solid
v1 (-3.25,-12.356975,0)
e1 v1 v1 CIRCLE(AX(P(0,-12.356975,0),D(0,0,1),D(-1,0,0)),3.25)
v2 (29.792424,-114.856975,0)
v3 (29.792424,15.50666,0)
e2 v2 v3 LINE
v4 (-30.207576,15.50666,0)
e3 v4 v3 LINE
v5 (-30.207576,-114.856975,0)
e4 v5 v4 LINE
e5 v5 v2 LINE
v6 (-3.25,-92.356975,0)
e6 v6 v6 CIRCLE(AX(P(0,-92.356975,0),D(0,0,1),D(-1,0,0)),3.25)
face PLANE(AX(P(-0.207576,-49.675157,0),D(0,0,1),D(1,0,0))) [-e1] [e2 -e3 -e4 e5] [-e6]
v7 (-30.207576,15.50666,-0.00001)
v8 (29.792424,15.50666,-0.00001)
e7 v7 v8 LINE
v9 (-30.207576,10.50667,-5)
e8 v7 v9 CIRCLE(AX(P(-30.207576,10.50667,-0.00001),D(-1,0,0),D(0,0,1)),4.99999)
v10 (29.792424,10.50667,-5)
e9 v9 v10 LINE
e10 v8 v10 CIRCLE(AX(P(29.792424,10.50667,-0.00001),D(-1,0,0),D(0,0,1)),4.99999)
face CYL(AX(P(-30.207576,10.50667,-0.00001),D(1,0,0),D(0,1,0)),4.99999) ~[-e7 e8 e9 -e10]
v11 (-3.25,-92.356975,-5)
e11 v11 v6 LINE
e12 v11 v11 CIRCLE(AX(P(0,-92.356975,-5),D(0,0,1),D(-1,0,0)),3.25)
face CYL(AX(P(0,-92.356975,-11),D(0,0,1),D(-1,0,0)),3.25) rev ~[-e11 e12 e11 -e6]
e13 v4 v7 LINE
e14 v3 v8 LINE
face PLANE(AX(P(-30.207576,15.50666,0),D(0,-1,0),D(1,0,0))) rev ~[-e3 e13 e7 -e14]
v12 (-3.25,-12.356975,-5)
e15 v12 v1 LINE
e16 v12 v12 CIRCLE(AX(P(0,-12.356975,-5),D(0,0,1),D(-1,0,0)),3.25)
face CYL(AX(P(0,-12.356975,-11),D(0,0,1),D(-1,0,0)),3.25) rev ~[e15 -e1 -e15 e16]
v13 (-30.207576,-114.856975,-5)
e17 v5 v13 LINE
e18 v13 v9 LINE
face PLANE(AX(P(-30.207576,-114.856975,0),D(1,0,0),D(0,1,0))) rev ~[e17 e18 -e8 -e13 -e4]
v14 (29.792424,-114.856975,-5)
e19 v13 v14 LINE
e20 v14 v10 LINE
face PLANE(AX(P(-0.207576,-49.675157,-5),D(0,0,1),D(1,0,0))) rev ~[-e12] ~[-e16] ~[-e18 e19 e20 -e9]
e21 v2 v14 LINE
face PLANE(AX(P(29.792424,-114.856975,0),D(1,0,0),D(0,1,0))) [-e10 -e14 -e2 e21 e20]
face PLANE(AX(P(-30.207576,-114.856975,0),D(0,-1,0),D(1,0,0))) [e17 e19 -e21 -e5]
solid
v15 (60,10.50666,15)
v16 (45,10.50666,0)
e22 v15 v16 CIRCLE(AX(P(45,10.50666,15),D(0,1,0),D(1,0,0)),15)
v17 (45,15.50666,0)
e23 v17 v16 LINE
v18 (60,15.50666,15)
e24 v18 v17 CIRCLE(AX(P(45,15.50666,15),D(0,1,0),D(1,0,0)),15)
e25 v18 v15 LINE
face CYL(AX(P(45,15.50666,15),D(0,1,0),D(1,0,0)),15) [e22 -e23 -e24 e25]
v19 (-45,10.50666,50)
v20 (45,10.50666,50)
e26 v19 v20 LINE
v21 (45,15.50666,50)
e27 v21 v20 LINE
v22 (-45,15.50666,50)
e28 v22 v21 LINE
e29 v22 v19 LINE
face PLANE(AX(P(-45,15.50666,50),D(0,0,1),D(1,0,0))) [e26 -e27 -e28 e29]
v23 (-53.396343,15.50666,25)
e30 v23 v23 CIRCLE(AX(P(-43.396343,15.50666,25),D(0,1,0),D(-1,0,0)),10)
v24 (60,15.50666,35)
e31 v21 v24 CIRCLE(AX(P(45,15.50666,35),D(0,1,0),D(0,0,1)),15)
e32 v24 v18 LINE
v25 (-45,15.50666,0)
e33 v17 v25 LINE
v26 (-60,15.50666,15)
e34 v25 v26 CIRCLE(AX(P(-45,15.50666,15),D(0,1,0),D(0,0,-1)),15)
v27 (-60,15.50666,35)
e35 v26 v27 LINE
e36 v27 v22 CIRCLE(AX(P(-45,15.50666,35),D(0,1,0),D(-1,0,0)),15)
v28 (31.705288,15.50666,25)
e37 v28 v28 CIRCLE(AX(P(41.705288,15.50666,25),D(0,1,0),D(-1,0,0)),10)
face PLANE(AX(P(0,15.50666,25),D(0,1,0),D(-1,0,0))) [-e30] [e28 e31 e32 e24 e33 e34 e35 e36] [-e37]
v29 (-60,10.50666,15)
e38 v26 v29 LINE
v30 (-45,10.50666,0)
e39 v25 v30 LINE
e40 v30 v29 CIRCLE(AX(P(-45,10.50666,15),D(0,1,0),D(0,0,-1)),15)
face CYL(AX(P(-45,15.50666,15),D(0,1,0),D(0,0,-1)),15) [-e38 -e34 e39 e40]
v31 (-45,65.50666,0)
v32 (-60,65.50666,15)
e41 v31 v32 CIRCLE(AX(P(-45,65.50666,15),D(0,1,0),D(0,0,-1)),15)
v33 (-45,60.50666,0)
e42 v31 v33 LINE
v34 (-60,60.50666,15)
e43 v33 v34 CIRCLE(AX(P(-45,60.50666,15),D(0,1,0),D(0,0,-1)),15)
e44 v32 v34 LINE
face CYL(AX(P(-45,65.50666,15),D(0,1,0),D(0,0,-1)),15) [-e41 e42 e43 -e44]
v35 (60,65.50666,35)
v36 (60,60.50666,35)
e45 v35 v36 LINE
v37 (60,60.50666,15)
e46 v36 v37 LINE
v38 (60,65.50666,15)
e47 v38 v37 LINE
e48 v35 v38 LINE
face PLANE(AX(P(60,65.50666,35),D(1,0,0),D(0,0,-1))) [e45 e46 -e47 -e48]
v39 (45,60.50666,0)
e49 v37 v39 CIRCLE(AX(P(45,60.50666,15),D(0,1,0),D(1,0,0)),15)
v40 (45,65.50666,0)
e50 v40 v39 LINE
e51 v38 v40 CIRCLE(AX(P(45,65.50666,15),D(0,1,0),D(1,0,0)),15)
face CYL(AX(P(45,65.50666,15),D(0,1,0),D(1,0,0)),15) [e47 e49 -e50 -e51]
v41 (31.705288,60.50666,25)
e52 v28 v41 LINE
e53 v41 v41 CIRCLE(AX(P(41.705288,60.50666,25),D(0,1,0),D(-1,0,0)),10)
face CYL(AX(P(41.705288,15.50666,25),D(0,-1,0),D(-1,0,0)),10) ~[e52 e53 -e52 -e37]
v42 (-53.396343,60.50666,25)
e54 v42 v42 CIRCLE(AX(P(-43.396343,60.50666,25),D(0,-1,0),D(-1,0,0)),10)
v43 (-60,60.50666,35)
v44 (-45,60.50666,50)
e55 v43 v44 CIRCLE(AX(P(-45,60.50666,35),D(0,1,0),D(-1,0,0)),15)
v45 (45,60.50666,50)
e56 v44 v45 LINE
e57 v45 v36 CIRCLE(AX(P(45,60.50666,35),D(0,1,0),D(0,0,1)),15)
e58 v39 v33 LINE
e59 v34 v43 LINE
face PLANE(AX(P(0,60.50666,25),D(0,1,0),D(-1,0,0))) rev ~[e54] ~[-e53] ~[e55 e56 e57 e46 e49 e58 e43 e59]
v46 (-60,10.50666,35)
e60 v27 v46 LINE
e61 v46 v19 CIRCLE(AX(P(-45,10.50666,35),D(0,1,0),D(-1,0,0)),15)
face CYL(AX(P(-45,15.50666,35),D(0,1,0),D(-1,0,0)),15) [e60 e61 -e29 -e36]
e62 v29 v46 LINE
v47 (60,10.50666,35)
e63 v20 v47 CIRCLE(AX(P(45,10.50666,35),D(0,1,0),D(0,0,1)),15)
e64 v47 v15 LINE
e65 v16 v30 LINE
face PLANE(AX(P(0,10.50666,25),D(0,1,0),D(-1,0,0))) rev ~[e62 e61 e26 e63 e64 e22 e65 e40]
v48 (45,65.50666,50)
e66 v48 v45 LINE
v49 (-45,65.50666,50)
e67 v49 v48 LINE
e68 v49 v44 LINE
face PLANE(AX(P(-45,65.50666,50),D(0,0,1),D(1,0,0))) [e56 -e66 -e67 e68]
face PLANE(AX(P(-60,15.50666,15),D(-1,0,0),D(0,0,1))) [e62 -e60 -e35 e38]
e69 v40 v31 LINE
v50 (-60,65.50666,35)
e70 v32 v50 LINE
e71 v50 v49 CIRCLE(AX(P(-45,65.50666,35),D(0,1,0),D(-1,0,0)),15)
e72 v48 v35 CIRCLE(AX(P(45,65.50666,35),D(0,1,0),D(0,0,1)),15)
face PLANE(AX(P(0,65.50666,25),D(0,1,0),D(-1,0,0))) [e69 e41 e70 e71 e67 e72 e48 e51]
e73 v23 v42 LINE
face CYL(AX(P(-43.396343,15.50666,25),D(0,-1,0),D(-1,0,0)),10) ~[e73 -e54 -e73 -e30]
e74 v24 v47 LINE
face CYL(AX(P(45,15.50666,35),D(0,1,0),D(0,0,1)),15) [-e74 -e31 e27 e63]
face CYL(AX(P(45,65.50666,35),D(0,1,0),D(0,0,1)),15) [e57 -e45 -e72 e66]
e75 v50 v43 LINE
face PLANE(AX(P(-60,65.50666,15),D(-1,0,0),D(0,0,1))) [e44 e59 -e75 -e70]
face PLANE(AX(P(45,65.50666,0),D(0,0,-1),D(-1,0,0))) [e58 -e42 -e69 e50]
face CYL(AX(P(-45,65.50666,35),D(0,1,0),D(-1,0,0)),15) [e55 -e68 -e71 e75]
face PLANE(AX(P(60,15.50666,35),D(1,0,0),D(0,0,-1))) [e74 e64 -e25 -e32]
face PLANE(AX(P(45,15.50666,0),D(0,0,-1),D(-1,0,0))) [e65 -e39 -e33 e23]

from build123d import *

# Parameters (mm, degrees)
F0_W     = 60
F0_H     = 130.3636354738
F1_DEPTH = 5
F3_DEPTH = 5
F4_R     = 10
F5_DEPTH = 50
F6_R     = 10
F7_DEPTH = 5
F9_D     = 6.5
F9_DEPTH = 6
F9_TIP   = 1.9527970118
F10_R    = 4.99999


# Not quite as in the source:
# - a fillet or chamfer is up to 0.001 mm smaller than in the source, because OpenCascade refuses the exact size


with BuildPart() as f1:
    # F0 (on Top) → F1 (new body)
    with BuildSketch(Plane.XY):
        with Locations((-0.2075759694, -49.6751572937)):
            Rectangle(F0_W, F0_H)
    extrude(amount=-F1_DEPTH)

    # F9
    with Locations(Plane(origin=(0, 0, -5), x_dir=(1, 0, 0), z_dir=(0, 0, -1))):
        with Locations((0, 12.3569750306), (0, 92.3569750306)):
            Hole(F9_D / 2, depth=F9_DEPTH)
            with Locations((0, 0, -(F9_DEPTH + F9_TIP / 2))):  # 118° drill point
                Cone(0, F9_D / 2, F9_TIP, mode=Mode.SUBTRACT)

    # F10 (radius 5 in the source; OpenCascade refuses exactly that, so slightly less here)
    f10_edges = [f1.edges().sort_by_distance(p)[0] for p in [
        (-0.207576, 15.50666, -5),
    ]]
    fillet(f10_edges, radius=F10_R)


with BuildPart() as f3:
    # F2 (on face) → F3 (new body)
    with BuildSketch(Plane(origin=(0, 15.5066604432, 0), x_dir=(-1, 0, 0), z_dir=(0, 1, 0))):
        with BuildLine():
            ThreePointArc((-60, 15), (-55.6066017178, 4.3933982822), (-45, 0))
            Line((-45, 0), (-29.7924240306, 0))
            Line((-29.7924240306, 0), (30.2075759694, 0))
            Line((30.2075759694, 0), (45, 0))
            ThreePointArc((45, 0), (55.6066017178, 4.3933982822), (60, 15))
            Line((60, 15), (60, 35))
            ThreePointArc((60, 35), (55.6066017178, 45.6066017178), (45, 50))
            Line((45, 50), (-45, 50))
            ThreePointArc((-45, 50), (-55.6066017178, 45.6066017178), (-60, 35))
            Line((-60, 35), (-60, 15))
        make_face()
    extrude(amount=-F3_DEPTH)

    # F4 (on face) → F5 (join)
    with BuildSketch(Plane(origin=(0, 15.5066604432, 0), x_dir=(-1, 0, 0), z_dir=(0, 1, 0))):
        with Locations((-41.705287993, 25)):
            Circle(F4_R)
        with Locations((43.3963425457, 25)):
            Circle(F4_R)
    extrude(amount=F5_DEPTH)

    # F6 (on face) → F7 (join)
    with BuildSketch(Plane(origin=(0, 65.5066604432, 0), x_dir=(-1, 0, 0), z_dir=(0, 1, 0))):
        with BuildLine():
            Line((-45, 0), (45, 0))
            ThreePointArc((45, 0), (55.6066017178, 4.3933982822), (60, 15))
            Line((60, 15), (60, 35))
            ThreePointArc((60, 35), (55.6066017178, 45.6066017178), (45, 50))
            Line((45, 50), (-45, 50))
            ThreePointArc((-45, 50), (-55.6066017178, 45.6066017178), (-60, 35))
            Line((-60, 35), (-60, 15))
            ThreePointArc((-60, 15), (-55.6066017178, 4.3933982822), (-45, 0))
        make_face()
        with Locations((-41.705287993, 25)):
            Circle(F6_R, mode=Mode.SUBTRACT)
    extrude(amount=-F7_DEPTH)


solid = Compound([f1.part, f3.part])
